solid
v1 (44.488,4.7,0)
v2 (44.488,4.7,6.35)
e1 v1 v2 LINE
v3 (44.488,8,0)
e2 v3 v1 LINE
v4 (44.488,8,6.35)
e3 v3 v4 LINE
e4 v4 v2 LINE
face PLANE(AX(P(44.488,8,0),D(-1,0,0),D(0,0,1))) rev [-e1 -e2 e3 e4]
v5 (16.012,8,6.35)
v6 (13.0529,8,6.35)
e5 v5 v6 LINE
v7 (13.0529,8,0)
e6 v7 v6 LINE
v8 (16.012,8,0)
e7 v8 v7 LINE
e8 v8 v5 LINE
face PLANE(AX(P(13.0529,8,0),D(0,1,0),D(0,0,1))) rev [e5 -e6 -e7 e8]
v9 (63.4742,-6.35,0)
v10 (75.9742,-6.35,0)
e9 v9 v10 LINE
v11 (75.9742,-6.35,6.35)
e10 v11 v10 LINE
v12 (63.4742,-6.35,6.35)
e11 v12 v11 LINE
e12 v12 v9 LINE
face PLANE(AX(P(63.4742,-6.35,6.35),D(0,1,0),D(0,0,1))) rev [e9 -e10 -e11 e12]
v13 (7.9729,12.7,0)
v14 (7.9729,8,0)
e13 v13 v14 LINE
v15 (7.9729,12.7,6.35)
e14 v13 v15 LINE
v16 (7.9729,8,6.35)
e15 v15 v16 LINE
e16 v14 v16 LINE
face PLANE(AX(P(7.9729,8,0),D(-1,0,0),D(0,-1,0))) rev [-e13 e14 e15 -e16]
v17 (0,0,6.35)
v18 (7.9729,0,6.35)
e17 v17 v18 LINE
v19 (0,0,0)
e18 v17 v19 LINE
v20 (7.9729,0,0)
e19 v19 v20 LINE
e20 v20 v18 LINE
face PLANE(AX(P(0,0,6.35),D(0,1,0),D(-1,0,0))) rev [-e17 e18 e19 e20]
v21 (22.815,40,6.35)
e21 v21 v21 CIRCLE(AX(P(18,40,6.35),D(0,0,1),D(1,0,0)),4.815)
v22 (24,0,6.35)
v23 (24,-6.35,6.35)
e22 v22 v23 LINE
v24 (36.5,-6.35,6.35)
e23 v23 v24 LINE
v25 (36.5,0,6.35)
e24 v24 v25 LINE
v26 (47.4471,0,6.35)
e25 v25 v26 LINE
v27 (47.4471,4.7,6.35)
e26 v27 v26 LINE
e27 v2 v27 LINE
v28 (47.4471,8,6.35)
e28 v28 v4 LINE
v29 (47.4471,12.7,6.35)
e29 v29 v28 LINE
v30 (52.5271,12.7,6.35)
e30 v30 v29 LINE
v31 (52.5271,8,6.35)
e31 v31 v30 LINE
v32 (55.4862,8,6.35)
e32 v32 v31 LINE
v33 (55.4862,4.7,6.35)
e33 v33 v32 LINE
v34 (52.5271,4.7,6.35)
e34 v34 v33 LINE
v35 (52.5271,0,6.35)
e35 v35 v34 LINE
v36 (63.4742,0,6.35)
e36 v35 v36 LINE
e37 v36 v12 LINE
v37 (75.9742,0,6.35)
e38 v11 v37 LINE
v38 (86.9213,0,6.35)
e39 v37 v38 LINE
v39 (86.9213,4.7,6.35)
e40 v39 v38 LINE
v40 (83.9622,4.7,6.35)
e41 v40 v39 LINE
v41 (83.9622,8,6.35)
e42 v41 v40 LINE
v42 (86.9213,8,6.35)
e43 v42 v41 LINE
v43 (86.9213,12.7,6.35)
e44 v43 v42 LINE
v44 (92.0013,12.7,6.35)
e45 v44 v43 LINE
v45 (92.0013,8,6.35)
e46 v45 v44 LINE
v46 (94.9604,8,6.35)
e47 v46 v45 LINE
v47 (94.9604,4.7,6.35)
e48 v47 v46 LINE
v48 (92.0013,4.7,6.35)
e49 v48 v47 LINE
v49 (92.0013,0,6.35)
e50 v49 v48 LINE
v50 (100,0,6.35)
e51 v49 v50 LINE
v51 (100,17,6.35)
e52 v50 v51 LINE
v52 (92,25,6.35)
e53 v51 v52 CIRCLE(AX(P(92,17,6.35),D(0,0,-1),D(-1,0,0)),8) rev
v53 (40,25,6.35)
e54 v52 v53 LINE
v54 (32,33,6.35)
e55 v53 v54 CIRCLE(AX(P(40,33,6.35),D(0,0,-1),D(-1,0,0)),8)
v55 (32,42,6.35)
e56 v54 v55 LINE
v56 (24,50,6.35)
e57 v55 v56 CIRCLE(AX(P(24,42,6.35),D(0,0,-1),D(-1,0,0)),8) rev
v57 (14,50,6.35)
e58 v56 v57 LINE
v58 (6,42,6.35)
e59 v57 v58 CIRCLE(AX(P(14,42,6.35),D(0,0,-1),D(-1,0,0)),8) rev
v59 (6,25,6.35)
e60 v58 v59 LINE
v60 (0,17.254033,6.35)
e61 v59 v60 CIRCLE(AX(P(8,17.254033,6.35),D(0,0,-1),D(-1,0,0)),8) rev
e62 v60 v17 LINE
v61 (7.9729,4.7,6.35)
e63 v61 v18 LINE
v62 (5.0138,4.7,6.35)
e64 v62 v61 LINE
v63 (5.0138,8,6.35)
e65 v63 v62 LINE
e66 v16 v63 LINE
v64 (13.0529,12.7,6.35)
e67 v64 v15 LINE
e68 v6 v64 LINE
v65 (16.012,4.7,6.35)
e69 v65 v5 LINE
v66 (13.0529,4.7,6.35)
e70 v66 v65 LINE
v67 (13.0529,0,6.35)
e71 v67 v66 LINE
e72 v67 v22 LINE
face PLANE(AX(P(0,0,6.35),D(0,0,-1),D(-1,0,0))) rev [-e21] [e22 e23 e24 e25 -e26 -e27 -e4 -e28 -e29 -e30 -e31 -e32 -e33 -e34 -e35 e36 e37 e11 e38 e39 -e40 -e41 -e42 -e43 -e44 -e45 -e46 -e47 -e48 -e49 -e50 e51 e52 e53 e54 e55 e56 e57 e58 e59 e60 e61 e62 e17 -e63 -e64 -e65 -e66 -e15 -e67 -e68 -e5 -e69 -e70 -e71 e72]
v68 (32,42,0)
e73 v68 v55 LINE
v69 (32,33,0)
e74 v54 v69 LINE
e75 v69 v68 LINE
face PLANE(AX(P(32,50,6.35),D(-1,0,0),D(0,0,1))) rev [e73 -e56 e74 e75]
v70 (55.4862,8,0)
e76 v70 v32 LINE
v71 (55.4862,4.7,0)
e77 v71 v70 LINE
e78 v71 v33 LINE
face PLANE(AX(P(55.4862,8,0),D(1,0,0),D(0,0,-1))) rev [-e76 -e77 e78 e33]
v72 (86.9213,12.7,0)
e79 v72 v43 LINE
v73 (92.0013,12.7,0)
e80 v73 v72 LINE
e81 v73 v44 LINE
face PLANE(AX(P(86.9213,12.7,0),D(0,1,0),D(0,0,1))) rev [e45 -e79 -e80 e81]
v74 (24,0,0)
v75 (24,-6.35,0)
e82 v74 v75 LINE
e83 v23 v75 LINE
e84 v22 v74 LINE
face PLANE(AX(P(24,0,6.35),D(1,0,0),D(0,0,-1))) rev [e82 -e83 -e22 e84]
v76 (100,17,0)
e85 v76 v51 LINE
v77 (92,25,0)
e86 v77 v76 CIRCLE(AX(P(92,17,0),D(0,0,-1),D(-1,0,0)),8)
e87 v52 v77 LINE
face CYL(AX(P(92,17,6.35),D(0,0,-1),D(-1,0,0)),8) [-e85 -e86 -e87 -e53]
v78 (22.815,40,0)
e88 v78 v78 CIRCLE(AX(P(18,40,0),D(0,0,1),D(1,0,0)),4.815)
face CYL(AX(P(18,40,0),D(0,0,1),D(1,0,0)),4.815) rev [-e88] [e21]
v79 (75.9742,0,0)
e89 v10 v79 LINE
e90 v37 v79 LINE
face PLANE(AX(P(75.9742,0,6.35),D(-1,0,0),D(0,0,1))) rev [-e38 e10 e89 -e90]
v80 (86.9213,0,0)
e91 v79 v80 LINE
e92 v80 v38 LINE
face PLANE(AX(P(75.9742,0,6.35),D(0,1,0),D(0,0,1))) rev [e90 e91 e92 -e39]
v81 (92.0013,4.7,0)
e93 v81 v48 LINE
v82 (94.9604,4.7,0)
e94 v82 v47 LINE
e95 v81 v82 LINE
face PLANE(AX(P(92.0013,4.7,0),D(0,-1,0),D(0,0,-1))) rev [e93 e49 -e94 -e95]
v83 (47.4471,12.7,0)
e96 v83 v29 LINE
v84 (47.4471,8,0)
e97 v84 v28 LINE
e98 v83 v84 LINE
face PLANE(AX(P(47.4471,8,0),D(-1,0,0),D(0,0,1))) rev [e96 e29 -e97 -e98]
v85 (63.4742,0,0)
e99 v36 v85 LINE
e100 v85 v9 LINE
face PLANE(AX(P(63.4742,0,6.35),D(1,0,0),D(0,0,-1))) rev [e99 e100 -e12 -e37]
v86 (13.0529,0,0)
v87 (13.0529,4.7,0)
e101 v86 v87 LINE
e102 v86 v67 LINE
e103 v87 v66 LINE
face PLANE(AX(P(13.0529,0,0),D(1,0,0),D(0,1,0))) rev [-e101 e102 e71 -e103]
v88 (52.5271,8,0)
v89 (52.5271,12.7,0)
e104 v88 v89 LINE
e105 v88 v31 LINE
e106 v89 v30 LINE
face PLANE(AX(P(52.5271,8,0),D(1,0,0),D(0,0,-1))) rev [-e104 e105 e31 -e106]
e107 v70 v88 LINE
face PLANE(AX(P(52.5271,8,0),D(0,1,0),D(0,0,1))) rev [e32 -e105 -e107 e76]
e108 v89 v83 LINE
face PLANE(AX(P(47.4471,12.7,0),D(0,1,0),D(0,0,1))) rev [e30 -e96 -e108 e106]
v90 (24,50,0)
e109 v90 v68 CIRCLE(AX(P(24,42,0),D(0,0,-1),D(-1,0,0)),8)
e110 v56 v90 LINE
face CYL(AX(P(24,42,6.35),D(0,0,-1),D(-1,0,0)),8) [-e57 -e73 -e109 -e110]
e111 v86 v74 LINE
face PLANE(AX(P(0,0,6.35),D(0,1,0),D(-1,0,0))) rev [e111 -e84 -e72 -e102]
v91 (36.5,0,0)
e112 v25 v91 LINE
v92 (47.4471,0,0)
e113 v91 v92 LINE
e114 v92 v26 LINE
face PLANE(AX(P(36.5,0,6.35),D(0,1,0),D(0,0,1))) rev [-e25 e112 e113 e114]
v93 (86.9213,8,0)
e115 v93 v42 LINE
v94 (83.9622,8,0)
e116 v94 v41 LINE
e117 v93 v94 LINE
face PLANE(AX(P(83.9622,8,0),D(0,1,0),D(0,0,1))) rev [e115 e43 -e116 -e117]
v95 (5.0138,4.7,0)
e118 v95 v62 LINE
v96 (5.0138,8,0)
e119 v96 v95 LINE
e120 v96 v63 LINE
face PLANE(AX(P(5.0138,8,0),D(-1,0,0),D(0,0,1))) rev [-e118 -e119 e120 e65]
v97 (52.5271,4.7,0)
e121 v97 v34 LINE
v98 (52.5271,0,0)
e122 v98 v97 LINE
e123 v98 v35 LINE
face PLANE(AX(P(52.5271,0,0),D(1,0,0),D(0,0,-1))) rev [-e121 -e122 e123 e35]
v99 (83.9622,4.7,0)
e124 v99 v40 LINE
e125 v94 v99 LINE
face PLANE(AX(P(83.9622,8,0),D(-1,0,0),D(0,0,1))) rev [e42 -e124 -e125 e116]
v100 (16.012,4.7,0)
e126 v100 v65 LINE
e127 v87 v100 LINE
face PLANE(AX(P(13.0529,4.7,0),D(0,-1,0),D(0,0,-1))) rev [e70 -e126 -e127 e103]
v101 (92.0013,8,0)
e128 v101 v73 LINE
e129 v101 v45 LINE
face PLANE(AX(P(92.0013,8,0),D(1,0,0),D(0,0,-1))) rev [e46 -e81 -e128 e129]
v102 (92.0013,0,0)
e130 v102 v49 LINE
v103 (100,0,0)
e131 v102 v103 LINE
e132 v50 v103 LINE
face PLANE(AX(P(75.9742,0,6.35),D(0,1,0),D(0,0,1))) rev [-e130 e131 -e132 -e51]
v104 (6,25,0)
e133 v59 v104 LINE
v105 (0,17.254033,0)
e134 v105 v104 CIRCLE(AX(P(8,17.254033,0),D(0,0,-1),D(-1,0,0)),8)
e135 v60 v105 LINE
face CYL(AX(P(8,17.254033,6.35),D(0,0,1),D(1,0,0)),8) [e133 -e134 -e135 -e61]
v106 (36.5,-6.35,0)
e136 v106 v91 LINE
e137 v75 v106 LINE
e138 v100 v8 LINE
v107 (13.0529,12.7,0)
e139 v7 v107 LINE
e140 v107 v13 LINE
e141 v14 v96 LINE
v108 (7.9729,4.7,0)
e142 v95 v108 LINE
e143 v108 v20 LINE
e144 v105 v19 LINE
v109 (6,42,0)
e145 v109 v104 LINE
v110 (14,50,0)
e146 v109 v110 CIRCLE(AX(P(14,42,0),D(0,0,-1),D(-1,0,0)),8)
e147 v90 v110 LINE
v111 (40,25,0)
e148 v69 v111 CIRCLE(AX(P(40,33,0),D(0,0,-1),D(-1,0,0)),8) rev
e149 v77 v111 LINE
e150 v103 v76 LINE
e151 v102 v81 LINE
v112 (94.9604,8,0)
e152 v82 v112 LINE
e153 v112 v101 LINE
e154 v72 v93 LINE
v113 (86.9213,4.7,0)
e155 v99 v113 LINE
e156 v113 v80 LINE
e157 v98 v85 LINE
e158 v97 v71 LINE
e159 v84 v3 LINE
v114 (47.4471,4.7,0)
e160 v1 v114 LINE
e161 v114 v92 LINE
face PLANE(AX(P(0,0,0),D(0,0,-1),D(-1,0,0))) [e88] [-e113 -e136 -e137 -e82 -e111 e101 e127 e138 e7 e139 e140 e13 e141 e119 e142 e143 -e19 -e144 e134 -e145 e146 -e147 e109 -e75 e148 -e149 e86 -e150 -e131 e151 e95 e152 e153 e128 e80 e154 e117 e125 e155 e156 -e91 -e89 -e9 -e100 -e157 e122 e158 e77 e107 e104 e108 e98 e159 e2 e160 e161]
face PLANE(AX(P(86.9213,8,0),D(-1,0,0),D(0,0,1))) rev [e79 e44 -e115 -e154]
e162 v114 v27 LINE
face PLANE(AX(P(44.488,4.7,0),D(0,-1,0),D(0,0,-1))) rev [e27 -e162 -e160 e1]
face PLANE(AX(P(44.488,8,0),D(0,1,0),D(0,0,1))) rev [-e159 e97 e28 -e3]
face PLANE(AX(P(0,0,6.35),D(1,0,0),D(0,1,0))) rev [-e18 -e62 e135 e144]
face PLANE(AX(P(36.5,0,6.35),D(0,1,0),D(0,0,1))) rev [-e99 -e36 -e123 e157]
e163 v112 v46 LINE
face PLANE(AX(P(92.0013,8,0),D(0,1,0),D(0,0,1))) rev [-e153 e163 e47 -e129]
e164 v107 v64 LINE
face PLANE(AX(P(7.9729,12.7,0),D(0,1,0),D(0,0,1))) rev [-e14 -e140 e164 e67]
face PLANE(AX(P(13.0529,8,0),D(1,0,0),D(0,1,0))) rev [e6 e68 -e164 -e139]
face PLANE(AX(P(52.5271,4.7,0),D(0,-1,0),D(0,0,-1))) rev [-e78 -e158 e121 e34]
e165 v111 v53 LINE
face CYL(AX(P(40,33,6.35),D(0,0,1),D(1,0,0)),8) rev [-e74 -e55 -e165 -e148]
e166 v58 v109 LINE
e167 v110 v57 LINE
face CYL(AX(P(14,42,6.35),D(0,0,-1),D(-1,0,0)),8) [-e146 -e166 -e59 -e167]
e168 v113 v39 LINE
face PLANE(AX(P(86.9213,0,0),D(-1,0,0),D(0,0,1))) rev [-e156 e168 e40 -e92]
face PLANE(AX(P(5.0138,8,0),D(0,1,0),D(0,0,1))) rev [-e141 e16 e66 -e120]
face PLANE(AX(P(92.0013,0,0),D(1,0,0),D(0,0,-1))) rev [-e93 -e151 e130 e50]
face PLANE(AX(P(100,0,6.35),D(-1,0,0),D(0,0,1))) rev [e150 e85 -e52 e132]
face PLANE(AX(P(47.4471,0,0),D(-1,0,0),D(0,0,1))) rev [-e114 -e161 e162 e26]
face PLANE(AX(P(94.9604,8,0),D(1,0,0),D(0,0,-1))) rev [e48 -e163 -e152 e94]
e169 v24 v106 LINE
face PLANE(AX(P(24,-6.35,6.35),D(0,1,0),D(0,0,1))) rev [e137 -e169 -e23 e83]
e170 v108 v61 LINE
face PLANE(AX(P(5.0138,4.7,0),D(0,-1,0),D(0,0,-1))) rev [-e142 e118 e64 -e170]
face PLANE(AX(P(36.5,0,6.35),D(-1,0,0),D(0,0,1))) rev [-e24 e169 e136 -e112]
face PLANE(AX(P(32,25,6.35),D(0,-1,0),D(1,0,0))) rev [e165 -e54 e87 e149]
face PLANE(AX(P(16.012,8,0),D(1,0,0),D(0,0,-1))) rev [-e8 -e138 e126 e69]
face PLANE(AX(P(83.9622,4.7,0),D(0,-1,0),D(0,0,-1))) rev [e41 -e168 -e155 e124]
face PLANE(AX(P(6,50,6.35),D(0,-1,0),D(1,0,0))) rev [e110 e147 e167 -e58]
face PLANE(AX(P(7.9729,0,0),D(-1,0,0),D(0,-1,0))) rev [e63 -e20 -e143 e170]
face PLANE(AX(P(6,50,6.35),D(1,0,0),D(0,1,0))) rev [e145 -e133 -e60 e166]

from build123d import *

# Parameters (mm, degrees)
BOSS_EXTRUDE1_DEPTH = 6.35
SKETCH2_R           = 4.815
CUT_EXTRUDE1_DEPTH  = 6.35
CUT_EXTRUDE2_DEPTH  = 112.983581386
FILLET1_R           = 8


with BuildPart() as part:
    # Sketch1 → Boss-Extrude1 (new body)
    with BuildSketch(Plane.XY):
        Polygon((36.5, 0), (63.4742, 0), (63.4742, -6.35), (75.9742, -6.35), (75.9742, 0), (100, 0), (100, 25), (32, 25), (32, 50), (6, 50), (6, 25), (0, 25), (0, 0), (24, 0), (24, -6.35), (36.5, -6.35), align=None)
    extrude(amount=BOSS_EXTRUDE1_DEPTH)

    # Sketch2 → Cut-Extrude1 (cut)
    with BuildSketch(Plane.XY.offset(6.35)):
        with Locations((18, 40)):
            Circle(SKETCH2_R)
    extrude(amount=-CUT_EXTRUDE1_DEPTH, mode=Mode.SUBTRACT)

    # Sketch3 → Cut-Extrude2 (cut, through all)
    with BuildSketch(Plane.XY.offset(6.35)):
        Polygon((7.9729, 0), (7.9729, 4.7), (5.0138, 4.7), (5.0138, 8), (7.9729, 8), (7.9729, 12.7), (13.0529, 12.7), (13.0529, 8), (16.012, 8), (16.012, 4.7), (13.0529, 4.7), (13.0529, 0), align=None)
        Polygon((47.4471, 12.7), (52.5271, 12.7), (52.5271, 8), (55.4862, 8), (55.4862, 4.7), (52.5271, 4.7), (52.5271, 0), (47.4471, 0), (47.4471, 4.7), (44.488, 4.7), (44.488, 8), (47.4471, 8), align=None)
        Polygon((86.9213, 12.7), (92.0013, 12.7), (92.0013, 8), (94.9604, 8), (94.9604, 4.7), (92.0013, 4.7), (92.0013, 0), (86.9213, 0), (86.9213, 4.7), (83.9622, 4.7), (83.9622, 8), (86.9213, 8), align=None)
    extrude(amount=-CUT_EXTRUDE2_DEPTH, mode=Mode.SUBTRACT)

    # Fillet1
    # the kernel refuses this fillet: 8 mm, written as the material it adds along each edge
    with BuildSketch(Plane(origin=(32, 25, 0), x_dir=(0, 1, 0), z_dir=(0, 0, 1))) as fillet1_piece_1:
        with BuildLine():
            CenterArc((FILLET1_R, -FILLET1_R), FILLET1_R, 90, 90)
            Line((0, -FILLET1_R), (0, 0))
            Line((0, 0), (FILLET1_R, 0))
        make_face()
    extrude(amount=6.35)
    # the kernel refuses this fillet: 8 mm, written as the material it takes off along each edge
    with BuildSketch(Plane(origin=(0, 25, -19.364916731), x_dir=(0, -1, 0), z_dir=(0, 0, 1))) as fillet1_2_piece_1:
        with BuildLine():
            CenterArc((7.745966692, 8), FILLET1_R, 194.477512186, 75.522487814)
            Line((0, 6), (0, 0))
            Line((0, 0), (7.745966692, 0))
        make_face()
    extrude(amount=45.079833462, mode=Mode.SUBTRACT)
    with BuildSketch(Plane(origin=(6, 50, -20), x_dir=(0, -1, 0), z_dir=(0, 0, 1)), Plane(origin=(32, 50, -20), x_dir=(-1, 0, 0), z_dir=(0, 0, 1)), Plane(origin=(100, 25, -20), x_dir=(-1, 0, 0), z_dir=(0, 0, 1))) as fillet1_2_piece_2:
        with BuildLine():
            CenterArc((FILLET1_R, FILLET1_R), FILLET1_R, 180, 90)
            Line((0, FILLET1_R), (0, 0))
            Line((0, 0), (FILLET1_R, 0))
        make_face()
    extrude(amount=46.35, mode=Mode.SUBTRACT)


solid = part.part
